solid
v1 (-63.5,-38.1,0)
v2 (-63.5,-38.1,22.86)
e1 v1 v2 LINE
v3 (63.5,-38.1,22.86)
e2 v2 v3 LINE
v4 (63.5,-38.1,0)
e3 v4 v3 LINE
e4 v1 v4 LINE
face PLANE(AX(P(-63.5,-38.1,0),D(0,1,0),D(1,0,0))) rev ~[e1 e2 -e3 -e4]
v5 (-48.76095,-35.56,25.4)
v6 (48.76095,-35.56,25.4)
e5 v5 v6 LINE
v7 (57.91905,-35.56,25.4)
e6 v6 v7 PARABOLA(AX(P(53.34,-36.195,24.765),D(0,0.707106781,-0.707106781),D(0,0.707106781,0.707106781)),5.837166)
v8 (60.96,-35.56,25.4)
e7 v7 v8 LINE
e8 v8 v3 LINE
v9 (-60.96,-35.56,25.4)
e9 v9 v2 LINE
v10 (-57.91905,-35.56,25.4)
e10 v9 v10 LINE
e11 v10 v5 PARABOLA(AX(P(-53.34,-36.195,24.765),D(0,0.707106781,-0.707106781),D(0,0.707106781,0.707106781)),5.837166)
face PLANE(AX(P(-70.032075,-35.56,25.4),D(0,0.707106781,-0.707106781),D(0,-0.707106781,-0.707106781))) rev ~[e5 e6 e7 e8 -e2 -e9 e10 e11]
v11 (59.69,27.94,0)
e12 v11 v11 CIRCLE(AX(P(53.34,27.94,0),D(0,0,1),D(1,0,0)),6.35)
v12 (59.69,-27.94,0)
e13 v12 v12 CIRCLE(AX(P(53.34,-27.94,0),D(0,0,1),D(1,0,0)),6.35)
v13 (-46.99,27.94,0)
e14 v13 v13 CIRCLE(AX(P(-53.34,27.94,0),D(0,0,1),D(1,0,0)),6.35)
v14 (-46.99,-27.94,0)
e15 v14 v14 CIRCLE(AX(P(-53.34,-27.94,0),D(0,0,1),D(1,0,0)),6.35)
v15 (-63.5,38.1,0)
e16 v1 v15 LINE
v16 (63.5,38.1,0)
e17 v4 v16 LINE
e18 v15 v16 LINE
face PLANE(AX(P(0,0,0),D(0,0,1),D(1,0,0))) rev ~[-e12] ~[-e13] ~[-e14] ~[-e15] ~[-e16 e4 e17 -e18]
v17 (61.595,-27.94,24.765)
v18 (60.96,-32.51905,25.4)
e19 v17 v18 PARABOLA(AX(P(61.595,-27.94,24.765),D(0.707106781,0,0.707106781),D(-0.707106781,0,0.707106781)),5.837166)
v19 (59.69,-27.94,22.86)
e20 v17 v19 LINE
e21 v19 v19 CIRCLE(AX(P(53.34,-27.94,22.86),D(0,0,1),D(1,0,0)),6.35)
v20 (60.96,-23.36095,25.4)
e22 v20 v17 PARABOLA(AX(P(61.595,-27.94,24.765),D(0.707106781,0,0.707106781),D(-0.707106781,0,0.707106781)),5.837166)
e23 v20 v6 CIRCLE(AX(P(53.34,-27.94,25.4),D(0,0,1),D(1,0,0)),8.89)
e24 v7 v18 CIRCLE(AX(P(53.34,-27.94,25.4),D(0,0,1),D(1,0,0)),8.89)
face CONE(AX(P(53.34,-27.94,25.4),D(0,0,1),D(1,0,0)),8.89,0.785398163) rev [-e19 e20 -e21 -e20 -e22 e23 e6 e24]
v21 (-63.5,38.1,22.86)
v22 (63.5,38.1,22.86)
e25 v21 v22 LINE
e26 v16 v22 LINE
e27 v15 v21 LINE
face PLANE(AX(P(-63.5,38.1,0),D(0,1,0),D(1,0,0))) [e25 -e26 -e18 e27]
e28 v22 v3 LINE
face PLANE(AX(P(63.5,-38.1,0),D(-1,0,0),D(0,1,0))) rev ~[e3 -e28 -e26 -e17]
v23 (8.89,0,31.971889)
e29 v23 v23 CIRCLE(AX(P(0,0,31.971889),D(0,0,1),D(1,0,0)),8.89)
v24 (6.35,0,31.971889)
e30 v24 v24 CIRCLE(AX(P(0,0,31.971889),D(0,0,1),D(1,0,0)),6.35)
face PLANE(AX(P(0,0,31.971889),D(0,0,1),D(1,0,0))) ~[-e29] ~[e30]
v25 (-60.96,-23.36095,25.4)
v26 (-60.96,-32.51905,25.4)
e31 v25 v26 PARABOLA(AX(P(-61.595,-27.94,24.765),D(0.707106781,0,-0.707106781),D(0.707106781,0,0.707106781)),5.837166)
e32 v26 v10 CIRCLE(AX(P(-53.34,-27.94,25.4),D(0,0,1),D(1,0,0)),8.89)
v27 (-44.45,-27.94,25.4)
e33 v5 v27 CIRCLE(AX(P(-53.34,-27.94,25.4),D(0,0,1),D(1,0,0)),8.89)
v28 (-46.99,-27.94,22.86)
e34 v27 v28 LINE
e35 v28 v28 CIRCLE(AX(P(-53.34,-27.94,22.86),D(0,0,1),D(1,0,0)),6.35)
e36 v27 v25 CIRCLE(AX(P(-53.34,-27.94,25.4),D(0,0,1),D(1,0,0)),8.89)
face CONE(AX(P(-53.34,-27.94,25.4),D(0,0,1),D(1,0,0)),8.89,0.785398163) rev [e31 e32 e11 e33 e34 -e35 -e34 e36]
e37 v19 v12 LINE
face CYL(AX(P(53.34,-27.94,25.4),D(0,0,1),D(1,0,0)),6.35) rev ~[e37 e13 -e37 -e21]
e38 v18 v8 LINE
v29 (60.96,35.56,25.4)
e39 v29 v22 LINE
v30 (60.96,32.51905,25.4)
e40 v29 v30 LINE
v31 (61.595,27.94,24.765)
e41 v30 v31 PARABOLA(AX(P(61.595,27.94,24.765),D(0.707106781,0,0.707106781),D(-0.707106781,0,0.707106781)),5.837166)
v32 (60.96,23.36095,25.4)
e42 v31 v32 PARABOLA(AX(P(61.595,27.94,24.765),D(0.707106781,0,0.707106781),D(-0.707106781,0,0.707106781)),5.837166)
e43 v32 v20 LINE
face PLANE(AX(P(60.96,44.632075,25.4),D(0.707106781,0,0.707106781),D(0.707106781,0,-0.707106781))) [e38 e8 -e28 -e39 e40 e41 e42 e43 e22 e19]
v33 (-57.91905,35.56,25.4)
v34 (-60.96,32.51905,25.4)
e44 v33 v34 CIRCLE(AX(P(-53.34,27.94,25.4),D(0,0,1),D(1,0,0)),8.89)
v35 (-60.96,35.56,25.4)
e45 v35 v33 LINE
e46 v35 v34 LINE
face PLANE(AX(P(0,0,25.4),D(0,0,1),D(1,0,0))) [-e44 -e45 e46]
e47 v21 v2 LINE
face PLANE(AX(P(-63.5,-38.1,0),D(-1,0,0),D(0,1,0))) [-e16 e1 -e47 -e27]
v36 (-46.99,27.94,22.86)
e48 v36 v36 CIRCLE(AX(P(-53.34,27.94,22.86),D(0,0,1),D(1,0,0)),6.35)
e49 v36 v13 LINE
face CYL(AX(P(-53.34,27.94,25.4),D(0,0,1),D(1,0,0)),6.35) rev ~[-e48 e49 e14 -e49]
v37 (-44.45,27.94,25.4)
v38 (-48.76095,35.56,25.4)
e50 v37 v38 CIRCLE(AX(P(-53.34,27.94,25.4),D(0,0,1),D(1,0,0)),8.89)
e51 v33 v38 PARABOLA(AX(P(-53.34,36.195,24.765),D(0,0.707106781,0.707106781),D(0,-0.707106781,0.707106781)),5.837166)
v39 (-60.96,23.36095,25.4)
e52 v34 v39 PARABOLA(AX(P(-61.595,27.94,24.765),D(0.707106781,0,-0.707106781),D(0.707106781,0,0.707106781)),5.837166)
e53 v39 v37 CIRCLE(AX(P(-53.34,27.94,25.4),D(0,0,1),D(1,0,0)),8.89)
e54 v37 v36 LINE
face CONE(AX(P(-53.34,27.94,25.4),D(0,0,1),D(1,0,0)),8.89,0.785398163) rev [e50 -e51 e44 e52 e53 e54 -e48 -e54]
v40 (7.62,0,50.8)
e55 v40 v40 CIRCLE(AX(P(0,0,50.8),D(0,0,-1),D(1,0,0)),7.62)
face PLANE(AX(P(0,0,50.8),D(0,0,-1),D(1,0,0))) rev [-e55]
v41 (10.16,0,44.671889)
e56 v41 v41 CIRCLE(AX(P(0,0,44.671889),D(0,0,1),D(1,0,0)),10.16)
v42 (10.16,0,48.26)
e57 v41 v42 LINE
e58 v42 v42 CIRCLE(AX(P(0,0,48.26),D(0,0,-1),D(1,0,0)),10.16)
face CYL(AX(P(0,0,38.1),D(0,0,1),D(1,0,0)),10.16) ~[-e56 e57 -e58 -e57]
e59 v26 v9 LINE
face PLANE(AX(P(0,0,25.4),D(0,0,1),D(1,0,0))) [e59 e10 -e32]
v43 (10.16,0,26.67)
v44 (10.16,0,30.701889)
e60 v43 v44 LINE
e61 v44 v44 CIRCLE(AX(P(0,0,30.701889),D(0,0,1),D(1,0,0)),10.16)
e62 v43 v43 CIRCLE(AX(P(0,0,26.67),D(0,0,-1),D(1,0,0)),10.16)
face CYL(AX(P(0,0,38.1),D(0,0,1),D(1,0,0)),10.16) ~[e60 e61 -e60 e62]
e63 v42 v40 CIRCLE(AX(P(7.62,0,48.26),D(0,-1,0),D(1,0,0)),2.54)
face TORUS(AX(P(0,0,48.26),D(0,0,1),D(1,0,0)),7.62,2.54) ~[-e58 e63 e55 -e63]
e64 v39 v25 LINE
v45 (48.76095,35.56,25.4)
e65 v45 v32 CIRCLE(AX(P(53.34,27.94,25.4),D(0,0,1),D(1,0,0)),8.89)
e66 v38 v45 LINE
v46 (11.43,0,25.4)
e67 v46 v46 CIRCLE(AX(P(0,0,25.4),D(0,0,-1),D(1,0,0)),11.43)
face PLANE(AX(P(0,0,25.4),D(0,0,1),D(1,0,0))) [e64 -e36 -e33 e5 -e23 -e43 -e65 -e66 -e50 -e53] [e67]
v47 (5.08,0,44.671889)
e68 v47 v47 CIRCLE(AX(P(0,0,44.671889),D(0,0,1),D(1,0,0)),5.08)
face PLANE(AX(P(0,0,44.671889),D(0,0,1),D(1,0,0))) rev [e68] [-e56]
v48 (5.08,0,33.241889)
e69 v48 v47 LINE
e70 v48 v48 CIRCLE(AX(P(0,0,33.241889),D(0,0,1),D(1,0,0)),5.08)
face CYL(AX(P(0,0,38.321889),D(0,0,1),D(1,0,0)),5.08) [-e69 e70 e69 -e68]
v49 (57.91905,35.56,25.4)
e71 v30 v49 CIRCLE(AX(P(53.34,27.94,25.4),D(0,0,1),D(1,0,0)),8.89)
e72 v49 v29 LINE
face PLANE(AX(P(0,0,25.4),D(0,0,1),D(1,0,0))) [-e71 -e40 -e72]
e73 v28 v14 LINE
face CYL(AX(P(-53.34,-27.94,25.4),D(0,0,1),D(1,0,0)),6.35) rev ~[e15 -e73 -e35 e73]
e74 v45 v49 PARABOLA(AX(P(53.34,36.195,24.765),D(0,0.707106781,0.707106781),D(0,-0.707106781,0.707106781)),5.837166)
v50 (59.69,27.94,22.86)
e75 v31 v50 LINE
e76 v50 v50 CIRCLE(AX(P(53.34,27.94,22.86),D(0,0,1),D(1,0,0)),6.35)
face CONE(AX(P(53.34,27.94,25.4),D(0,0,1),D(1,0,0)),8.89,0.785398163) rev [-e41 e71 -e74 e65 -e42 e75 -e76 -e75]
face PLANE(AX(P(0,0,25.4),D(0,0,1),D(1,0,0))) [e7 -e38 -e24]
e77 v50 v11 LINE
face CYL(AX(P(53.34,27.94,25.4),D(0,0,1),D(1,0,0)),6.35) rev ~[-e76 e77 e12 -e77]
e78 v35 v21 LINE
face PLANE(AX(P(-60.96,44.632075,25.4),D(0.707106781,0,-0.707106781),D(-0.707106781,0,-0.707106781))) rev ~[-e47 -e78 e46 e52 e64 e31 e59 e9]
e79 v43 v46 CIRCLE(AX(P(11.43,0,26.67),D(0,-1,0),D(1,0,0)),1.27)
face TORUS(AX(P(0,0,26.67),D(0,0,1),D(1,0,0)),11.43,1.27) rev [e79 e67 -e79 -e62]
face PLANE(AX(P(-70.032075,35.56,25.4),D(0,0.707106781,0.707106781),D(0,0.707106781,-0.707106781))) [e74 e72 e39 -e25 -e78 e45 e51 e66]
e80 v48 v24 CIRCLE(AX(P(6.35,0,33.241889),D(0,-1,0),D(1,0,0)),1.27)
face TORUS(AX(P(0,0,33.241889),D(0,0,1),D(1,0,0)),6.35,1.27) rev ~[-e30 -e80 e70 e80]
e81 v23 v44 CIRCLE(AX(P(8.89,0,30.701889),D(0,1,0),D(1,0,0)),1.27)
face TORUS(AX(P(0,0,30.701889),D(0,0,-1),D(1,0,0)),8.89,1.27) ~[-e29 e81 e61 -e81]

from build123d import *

# Parameters (mm, degrees)
F0_W         = 127
F0_H         = 76.2
F1_DEPTH     = 25.4
F2_R         = 6.35
F3_DEPTH     = 25.401
F4_W         = 10.16
F4_H         = 25.4
F6_W         = 15.24
F6_H         = 12.7
F8_R         = 2.54
F9_R         = 1.27
F10_T1_DEPTH = 140.0641495789
F10_T3_DEPTH = 89.2641495789


# Not quite as in the source:
# - a fillet or chamfer that OpenCascade refuses, or shapes differently, is made with other operations: its cross-section is extruded or revolved along the edge and cut away or added


with BuildPart() as f1:
    # F0 (on Top) → F1 (new body)
    with BuildSketch(Plane.XY):
        Rectangle(F0_W, F0_H)
    extrude(amount=F1_DEPTH)

    # F2 (on face) → F3 (cut, through all)
    with BuildSketch(Plane.XY.offset(25.4)):
        with Locations((53.34, 27.94)):
            Circle(F2_R)
        with Locations((53.34, -27.94)):
            Circle(F2_R)
        with Locations((-53.34, 27.94)):
            Circle(F2_R)
        with Locations((-53.34, -27.94)):
            Circle(F2_R)
    extrude(amount=-F3_DEPTH, mode=Mode.SUBTRACT)

    # F4 (on Front) → F5 (revolve)
    with BuildSketch(Plane.XZ):
        with Locations((5.08, 38.1)):
            Rectangle(F4_W, F4_H)
    revolve(axis=Axis((0, 0, 38.1), (0, 0, -1)))

    # F6 (on Front) → F7 (revolve, cut)
    with BuildSketch(Plane.XZ):
        with Locations((12.7, 38.3218890125)):
            Rectangle(F6_W, F6_H)
    revolve(axis=Axis((0, 0, 25.4), (0, 0, 1)), mode=Mode.SUBTRACT)

    # F8
    f8_edges = [f1.edges().sort_by_distance(p)[0] for p in [
        (-10.16, 0, 50.8),
    ]]
    fillet(f8_edges, radius=F8_R)

    # F9
    f9_edges = [f1.edges().sort_by_distance(p)[0] for p in [
        (-10.16, 0, 31.971889),
        (-5.08, 0, 31.971889),
        (-10.16, 0, 25.4),
    ]]
    fillet(f9_edges, radius=F9_R)

    # F10: chamfer of 2.54 on 9 edges, made by hand

    # F10_s2 → F10_t1 (cut)
    with BuildSketch(Plane.YZ.offset(-70.0320747894)):
        Polygon((35.56, 25.4), (38.1, 22.86), (38.1, 25.4), align=None)
        Polygon((-35.56, 25.4), (-38.1, 22.86), (-38.1, 25.4), align=None)
    extrude(amount=F10_T1_DEPTH, mode=Mode.SUBTRACT)

    # F10_s4 → F10_t3 (cut)
    with BuildSketch(Plane.XZ.offset(-44.6320747894)):
        Polygon((60.96, 25.4), (63.5, 22.86), (63.5, 25.4), align=None)
        Polygon((-60.96, 25.4), (-63.5, 22.86), (-63.5, 25.4), align=None)
    extrude(amount=F10_T3_DEPTH, mode=Mode.SUBTRACT)

    # F10_s5 → F10_t6 (revolve, cut)
    with BuildSketch(Plane.XZ.offset(27.94)):
        Polygon((-44.45, 25.4), (-46.99, 22.86), (-46.99, 25.4), align=None)
    revolve(axis=Axis((-53.34, -27.94, 25.4), (0, 0, 1)), mode=Mode.SUBTRACT)

    # F10_s7 → F10_t8 (revolve, cut)
    with BuildSketch(Plane.XZ.offset(27.94)):
        Polygon((62.23, 25.4), (59.69, 22.86), (59.69, 25.4), align=None)
    revolve(axis=Axis((53.34, -27.94, 25.4), (0, 0, 1)), mode=Mode.SUBTRACT)

    # F10_s9 → F10_t10 (revolve, cut)
    with BuildSketch(Plane.XZ.offset(-27.94)):
        Polygon((-44.45, 25.4), (-46.99, 22.86), (-46.99, 25.4), align=None)
    revolve(axis=Axis((-53.34, 27.94, 25.4), (0, 0, 1)), mode=Mode.SUBTRACT)

    # F10_s11 → F10_t12 (revolve, cut)
    with BuildSketch(Plane.XZ.offset(-27.94)):
        Polygon((62.23, 25.4), (59.69, 22.86), (59.69, 25.4), align=None)
    revolve(axis=Axis((53.34, 27.94, 25.4), (0, 0, 1)), mode=Mode.SUBTRACT)


solid = f1.part
